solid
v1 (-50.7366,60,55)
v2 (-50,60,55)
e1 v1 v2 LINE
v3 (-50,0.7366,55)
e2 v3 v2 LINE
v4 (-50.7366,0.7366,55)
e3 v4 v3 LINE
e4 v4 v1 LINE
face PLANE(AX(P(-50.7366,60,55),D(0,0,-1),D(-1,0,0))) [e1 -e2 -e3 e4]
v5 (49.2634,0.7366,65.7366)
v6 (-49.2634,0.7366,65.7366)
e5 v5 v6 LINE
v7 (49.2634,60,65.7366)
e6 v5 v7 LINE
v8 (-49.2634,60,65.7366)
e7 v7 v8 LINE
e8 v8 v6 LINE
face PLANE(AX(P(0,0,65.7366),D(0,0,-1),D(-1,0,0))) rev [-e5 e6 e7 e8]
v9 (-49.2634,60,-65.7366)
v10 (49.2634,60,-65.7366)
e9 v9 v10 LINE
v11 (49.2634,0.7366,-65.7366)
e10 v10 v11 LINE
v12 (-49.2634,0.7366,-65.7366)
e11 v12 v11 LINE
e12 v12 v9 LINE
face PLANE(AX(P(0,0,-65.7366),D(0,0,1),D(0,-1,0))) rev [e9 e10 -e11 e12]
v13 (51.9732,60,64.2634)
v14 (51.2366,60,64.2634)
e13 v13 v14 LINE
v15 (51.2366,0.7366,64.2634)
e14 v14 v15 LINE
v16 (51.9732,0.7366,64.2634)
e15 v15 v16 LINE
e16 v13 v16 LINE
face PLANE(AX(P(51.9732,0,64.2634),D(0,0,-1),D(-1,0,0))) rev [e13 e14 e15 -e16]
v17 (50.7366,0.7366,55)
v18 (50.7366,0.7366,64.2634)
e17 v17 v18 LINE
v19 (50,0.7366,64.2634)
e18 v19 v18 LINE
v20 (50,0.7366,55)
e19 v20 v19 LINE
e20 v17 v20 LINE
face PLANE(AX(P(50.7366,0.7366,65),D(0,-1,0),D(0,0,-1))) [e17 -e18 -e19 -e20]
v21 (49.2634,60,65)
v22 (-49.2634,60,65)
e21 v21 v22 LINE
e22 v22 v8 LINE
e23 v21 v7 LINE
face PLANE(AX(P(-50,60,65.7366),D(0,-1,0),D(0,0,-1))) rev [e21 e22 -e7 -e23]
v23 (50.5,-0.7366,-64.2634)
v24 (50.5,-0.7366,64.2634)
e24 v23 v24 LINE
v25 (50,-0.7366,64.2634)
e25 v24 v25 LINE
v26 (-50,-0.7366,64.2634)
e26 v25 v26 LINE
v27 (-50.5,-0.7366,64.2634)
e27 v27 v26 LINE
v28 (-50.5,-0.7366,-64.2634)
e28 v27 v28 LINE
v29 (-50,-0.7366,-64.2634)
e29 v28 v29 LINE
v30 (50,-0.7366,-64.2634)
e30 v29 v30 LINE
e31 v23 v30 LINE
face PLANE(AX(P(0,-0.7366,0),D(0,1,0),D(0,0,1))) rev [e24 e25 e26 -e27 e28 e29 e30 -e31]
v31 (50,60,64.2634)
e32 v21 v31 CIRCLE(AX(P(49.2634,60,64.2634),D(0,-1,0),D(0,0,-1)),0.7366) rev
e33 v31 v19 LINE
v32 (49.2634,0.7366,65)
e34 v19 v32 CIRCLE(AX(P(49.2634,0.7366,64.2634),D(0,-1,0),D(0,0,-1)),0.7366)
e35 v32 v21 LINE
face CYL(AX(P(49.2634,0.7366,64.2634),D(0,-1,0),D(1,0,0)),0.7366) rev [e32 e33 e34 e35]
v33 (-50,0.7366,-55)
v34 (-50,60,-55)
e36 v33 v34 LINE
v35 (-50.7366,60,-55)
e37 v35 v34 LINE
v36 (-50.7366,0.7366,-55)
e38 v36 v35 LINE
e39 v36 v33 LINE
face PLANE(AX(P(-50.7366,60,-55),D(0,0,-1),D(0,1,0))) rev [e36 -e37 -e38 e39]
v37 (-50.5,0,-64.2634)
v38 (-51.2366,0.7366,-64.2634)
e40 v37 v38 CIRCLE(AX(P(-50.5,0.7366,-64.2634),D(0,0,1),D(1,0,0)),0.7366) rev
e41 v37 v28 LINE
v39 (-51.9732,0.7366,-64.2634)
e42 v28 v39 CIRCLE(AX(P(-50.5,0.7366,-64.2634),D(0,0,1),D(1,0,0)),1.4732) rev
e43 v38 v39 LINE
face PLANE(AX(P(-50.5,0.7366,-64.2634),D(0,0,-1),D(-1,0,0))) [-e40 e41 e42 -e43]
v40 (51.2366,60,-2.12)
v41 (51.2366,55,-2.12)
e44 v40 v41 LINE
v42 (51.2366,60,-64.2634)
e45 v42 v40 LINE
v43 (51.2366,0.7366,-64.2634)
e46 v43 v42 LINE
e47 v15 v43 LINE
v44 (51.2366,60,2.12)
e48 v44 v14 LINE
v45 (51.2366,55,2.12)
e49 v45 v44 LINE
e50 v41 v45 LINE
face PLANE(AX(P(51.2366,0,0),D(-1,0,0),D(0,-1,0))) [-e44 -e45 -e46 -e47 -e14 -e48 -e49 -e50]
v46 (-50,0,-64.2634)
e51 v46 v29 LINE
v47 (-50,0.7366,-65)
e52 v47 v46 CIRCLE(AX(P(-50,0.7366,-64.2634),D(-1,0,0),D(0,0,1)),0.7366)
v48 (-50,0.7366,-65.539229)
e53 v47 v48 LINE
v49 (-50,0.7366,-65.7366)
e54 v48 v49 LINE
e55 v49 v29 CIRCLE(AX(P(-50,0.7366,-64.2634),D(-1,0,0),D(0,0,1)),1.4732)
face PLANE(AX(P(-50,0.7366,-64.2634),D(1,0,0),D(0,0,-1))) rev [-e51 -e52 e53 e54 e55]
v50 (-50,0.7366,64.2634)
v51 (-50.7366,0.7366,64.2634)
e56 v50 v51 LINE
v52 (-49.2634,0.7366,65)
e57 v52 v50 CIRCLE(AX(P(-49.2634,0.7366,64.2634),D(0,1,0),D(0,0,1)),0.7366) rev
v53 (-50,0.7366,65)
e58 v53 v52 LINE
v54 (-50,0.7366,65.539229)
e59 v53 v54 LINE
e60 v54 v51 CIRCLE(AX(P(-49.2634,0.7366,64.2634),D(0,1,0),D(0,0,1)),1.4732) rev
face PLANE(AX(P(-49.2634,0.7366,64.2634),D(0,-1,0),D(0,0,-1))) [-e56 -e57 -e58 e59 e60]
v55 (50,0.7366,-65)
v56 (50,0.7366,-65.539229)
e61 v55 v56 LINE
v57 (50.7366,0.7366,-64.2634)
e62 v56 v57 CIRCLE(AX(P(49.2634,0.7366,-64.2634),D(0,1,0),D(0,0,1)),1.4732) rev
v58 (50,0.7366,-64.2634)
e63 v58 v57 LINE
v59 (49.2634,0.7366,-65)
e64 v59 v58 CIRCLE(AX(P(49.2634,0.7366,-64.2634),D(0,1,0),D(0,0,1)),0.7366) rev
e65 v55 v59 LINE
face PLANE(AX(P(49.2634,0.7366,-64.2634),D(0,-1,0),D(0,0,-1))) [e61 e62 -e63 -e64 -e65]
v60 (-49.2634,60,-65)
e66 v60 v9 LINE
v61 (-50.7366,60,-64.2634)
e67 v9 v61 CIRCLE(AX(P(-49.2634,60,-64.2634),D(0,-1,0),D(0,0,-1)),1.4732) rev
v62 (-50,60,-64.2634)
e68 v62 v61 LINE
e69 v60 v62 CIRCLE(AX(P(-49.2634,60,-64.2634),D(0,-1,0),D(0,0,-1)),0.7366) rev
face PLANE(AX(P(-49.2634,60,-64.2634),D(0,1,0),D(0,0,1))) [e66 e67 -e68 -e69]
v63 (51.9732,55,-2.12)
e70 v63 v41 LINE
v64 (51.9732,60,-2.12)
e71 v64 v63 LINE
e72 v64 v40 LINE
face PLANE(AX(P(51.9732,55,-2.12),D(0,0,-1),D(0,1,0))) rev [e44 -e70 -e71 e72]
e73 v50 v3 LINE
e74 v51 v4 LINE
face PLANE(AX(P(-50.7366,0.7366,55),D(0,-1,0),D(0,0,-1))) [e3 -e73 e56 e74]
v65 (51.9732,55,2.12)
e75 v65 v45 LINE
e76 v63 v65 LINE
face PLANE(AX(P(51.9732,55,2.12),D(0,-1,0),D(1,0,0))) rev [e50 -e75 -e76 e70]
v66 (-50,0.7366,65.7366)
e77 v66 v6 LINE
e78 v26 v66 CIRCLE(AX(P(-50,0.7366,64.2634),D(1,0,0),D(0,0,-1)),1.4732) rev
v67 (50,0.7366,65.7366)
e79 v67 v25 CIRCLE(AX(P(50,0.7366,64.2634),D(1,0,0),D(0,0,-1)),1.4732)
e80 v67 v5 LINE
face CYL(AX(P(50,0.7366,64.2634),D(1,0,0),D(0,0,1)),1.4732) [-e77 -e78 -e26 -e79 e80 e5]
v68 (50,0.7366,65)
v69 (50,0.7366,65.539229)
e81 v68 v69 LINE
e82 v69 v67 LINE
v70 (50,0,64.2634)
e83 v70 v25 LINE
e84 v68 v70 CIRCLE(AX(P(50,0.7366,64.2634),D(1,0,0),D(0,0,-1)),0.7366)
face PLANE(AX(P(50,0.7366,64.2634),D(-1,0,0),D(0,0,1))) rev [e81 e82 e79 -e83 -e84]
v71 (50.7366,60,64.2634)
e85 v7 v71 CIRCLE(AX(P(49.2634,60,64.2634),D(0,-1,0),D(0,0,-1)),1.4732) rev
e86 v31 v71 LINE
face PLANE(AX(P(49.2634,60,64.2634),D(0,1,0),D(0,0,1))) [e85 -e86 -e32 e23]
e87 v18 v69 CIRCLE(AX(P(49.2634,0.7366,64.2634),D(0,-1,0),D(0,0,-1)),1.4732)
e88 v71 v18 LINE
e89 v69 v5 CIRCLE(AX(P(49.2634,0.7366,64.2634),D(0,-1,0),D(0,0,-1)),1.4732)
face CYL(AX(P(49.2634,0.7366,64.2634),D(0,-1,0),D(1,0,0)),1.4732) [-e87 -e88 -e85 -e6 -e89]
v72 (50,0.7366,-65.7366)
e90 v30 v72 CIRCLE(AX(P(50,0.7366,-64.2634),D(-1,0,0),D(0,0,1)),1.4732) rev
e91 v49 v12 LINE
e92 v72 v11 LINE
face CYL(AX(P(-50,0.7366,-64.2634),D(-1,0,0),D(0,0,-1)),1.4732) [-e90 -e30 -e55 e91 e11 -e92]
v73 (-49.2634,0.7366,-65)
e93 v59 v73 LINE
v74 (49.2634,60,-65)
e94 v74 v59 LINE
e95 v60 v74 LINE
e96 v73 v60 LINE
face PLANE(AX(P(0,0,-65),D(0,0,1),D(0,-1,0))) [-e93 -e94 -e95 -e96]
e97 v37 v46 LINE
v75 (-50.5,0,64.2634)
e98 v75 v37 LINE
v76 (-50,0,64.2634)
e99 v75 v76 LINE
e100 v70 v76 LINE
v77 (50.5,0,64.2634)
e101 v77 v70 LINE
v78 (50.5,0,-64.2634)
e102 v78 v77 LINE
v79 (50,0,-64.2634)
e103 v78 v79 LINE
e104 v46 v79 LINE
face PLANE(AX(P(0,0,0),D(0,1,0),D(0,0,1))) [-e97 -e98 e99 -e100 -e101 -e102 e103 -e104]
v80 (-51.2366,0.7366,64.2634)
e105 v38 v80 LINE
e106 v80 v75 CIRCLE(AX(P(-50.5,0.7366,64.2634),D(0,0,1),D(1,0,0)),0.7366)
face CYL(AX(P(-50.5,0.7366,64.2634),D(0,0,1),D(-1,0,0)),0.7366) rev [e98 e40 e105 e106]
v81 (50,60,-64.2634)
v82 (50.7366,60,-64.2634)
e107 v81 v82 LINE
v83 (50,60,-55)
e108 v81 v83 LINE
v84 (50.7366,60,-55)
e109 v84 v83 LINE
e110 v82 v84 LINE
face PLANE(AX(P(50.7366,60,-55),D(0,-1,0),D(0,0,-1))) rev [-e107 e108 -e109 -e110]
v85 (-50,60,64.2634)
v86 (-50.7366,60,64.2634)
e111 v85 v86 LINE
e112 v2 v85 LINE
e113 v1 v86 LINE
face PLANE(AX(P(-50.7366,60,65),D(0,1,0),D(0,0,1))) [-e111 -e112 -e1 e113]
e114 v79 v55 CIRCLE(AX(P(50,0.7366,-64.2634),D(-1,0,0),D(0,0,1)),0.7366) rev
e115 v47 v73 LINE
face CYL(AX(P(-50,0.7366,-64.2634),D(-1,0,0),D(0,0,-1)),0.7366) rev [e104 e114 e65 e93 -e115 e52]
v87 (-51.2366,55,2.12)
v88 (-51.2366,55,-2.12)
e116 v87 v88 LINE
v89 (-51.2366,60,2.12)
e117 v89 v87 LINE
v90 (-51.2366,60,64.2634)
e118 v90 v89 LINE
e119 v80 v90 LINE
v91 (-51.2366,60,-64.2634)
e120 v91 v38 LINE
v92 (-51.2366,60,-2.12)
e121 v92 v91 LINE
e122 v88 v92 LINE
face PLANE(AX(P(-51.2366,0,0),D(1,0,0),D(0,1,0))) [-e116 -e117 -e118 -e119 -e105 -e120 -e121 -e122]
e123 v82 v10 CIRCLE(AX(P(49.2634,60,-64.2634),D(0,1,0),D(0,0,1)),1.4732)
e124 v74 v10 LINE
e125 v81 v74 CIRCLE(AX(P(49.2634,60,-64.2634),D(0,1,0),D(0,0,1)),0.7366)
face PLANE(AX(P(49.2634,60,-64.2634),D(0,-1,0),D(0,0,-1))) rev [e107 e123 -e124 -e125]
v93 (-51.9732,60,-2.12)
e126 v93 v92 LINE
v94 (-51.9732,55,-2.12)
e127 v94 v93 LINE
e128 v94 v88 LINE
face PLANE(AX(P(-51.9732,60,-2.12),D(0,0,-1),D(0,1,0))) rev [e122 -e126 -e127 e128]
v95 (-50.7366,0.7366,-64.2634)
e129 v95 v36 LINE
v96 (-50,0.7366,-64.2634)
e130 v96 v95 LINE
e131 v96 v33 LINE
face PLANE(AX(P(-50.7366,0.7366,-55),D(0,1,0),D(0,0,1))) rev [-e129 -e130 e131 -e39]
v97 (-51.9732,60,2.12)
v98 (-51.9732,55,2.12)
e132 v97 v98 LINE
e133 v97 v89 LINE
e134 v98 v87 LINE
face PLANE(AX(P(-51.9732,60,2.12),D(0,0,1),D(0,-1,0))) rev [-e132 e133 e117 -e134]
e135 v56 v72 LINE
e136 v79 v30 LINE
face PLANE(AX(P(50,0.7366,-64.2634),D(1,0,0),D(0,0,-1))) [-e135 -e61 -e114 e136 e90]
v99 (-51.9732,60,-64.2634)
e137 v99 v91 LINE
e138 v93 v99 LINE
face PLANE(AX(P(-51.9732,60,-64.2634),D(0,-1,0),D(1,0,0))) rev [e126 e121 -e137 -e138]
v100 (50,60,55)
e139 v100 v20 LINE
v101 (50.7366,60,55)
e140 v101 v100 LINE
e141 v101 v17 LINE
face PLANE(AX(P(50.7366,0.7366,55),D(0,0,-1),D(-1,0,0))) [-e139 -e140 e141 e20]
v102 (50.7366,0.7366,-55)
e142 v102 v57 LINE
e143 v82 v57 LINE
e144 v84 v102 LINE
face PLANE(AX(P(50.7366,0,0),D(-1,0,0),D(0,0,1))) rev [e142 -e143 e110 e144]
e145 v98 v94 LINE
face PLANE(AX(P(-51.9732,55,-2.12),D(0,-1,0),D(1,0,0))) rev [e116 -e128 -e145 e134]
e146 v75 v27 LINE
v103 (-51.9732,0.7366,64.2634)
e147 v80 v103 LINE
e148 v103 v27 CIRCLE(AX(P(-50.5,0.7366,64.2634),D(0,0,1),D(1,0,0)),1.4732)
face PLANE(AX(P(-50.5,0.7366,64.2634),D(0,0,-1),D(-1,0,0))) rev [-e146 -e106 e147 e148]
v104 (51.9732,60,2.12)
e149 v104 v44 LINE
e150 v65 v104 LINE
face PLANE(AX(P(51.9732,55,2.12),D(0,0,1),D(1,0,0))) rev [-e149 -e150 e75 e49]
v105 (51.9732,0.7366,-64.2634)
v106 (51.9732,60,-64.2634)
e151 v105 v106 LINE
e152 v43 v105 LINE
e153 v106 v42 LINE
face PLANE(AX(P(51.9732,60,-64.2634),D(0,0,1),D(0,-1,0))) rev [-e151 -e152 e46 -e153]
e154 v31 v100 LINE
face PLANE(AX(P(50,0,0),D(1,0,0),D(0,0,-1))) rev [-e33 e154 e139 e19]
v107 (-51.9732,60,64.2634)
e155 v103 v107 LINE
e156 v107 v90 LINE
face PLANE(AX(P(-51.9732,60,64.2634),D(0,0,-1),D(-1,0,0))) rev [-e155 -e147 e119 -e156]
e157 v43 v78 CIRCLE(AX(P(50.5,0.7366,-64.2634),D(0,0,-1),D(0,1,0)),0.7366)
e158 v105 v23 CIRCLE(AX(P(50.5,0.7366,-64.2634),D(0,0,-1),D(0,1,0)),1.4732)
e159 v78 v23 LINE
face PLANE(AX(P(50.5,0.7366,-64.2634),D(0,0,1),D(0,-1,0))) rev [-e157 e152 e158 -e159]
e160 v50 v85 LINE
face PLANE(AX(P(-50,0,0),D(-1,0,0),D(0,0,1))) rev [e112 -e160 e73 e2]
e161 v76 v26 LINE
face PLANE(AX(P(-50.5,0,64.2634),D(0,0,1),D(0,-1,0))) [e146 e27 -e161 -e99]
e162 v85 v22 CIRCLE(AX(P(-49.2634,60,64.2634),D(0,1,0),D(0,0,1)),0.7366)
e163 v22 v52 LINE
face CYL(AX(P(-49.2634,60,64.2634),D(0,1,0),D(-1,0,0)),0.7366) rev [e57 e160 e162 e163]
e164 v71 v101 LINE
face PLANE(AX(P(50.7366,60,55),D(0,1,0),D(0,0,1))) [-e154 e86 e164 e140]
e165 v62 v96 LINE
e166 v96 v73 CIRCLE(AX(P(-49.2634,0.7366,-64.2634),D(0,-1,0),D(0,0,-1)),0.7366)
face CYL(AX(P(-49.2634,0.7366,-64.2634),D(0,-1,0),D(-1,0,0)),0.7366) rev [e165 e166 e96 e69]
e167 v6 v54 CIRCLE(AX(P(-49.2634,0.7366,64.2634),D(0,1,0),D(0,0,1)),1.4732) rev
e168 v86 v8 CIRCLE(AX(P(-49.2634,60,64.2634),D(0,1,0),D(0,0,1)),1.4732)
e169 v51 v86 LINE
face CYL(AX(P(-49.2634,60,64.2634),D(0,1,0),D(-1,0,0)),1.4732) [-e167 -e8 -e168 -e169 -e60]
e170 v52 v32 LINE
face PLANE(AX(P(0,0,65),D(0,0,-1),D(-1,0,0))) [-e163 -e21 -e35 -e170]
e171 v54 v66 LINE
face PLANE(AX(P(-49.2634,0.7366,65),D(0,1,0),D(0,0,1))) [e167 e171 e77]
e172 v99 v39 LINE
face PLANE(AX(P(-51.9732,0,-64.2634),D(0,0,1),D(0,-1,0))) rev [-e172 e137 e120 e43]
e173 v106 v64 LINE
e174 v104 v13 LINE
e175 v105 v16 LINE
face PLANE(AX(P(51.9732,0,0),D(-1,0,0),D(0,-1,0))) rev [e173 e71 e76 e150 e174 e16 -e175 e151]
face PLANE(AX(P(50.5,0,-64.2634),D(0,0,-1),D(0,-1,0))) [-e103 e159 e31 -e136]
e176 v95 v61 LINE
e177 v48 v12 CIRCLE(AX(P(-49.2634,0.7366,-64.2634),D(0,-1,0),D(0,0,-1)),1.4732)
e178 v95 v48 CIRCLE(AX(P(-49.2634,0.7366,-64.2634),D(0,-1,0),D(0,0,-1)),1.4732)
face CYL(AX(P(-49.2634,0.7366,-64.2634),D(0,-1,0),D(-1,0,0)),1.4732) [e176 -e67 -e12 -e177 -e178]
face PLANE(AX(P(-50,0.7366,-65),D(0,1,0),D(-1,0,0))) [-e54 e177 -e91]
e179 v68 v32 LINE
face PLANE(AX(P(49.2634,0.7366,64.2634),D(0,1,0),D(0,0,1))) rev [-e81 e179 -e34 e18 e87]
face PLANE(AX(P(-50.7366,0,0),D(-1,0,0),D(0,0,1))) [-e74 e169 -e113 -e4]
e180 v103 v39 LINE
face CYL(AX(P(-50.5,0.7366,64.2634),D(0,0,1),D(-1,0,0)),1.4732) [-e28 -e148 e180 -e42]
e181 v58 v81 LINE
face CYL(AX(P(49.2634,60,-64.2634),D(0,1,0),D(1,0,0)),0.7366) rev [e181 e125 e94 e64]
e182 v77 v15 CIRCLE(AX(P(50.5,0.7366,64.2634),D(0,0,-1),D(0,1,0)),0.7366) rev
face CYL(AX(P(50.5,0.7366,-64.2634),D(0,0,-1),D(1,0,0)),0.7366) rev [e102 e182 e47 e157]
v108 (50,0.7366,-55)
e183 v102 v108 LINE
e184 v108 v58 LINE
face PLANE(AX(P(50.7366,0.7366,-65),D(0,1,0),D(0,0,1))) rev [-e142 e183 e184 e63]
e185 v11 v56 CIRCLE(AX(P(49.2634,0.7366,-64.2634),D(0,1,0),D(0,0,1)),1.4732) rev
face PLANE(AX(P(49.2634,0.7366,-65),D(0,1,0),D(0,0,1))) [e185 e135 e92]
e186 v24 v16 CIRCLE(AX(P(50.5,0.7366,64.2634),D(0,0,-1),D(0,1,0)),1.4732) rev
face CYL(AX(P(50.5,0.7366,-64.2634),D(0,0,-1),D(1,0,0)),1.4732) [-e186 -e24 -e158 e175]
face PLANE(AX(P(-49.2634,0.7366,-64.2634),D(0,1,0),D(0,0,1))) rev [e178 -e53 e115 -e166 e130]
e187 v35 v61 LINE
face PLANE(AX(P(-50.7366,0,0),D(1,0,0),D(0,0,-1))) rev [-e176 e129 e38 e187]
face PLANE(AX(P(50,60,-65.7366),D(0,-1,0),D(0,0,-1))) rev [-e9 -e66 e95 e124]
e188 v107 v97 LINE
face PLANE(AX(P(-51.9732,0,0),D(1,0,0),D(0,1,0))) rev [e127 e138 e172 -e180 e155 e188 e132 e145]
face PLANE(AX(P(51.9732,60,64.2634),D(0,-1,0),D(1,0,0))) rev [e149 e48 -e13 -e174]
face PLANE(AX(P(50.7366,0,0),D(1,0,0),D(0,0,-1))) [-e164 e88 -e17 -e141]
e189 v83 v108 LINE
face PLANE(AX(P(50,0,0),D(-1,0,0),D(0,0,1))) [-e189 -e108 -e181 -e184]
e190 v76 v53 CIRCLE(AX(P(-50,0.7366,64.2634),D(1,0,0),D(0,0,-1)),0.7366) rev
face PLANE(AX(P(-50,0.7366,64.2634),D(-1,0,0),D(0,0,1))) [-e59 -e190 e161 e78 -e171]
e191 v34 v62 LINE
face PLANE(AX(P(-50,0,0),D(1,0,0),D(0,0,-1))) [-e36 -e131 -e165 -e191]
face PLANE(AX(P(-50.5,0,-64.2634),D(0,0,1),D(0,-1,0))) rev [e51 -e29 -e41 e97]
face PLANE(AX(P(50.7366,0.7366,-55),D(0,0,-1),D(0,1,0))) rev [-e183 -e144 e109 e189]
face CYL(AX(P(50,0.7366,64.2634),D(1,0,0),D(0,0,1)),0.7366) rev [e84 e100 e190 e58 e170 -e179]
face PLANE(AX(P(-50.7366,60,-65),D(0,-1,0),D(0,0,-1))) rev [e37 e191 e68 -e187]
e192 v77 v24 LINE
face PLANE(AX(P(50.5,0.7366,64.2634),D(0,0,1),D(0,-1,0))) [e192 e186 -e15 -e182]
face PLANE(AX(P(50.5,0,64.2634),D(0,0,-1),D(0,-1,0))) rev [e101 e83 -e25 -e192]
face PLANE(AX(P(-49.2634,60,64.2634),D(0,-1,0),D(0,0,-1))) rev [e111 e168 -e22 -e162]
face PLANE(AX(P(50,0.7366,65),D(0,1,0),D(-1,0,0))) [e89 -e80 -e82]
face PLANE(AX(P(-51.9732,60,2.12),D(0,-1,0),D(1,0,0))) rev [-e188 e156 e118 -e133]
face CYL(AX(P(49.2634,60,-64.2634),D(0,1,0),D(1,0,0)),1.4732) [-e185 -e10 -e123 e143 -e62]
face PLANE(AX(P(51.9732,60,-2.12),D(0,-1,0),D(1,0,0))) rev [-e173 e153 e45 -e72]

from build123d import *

# Parameters (mm, degrees)
SKETCH1_W                        = 100
SKETCH1_H                        = 130
BASE_FLANGE1_DEPTH               = 0.7366
BOX_REAR_STRIP_W                 = 4.4196
BOX_REAR_STRIP_H                 = 0.7366
BOX_REAR_STRIP_CUT_DEPTH         = 100
BOX_REAR_DEPTH                   = 100
BOX_FRONT_STRIP_W                = 4.4196
BOX_FRONT_STRIP_H                = 0.7366
BOX_FRONT_STRIP_CUT_DEPTH        = 100
BOX_FRONT_DEPTH                  = 100
BOX_FRONT_TABS_STRIP_W           = 4.4196
BOX_FRONT_TABS_STRIP_H           = 0.7366
BOX_FRONT_TABS_STRIP_CUT_DEPTH   = 59.2634
BOX_FRONT_TABS_STRIP_2_W         = 4.4196
BOX_FRONT_TABS_STRIP_2_H         = 0.7366
BOX_FRONT_TABS_STRIP_CUT_2_DEPTH = 59.2634
BOX_FRONT_TABS_DEPTH             = 59.2634
BOX_FRONT_TABS_BEND_DEPTH        = 59.2634
BOX_REAR_TABS_STRIP_W            = 4.4196
BOX_REAR_TABS_STRIP_H            = 0.7366
BOX_REAR_TABS_STRIP_CUT_DEPTH    = 59.2634
BOX_REAR_TABS_STRIP_2_W          = 4.4196
BOX_REAR_TABS_STRIP_2_H          = 0.7366
BOX_REAR_TABS_STRIP_CUT_2_DEPTH  = 59.2634
BOX_REAR_TABS_DEPTH              = 59.2634
BOX_REAR_TABS_BEND_DEPTH         = 59.2634
EDGE_FLANGE6_DEPTH               = 128.5268
EDGE_FLANGE6_START               = 0.7366
EDGE_FLANGE6_FLAT_DEPTH          = 0.7366
EDGE_FLANGE6_BEND_DEPTH          = 128.5268
EDGE_FLANGE6_FLAT_2_DEPTH        = 0.7366


# Sheet-metal steps are written as plain solids
with BuildPart() as part:
    # Sketch1 → Base-Flange1 (new body)
    with BuildSketch(Plane(origin=(0, 0, 0), x_dir=(1, 0, 0), z_dir=(0, 1, 0))):
        Rectangle(SKETCH1_W, SKETCH1_H)
    extrude(amount=-BASE_FLANGE1_DEPTH)

    # Box rear strip (across the edge) → Box rear strip cut (cut)
    with BuildSketch(Plane(origin=(50, 0, -65), x_dir=(0, 0, 1), z_dir=(-1, 0, 0))):
        with Locations((-1.4732, -0.3683)):
            Rectangle(BOX_REAR_STRIP_W, BOX_REAR_STRIP_H)
    extrude(amount=BOX_REAR_STRIP_CUT_DEPTH, mode=Mode.SUBTRACT)

    # Box rear section (across the edge) → Box rear (add)
    with BuildSketch(Plane(origin=(50, 0, -65), x_dir=(0, 0, 1), z_dir=(-1, 0, 0))):
        with BuildLine():
            Line((-0.7366, 0.7366), (-0.7366, 60))
            Line((-0.7366, 60), (0, 60))
            Line((0, 60), (0, 0.7366))
            ThreePointArc((0, 0.7366), (0.215745145, 0.215745145), (0.7366, 0))
            Line((0.7366, 0), (0.7366, -0.7366))
            ThreePointArc((0.7366, -0.7366), (-0.30510971, -0.30510971), (-0.7366, 0.7366))
        make_face()
    extrude(amount=BOX_REAR_DEPTH)

    # Box front strip (across the edge) → Box front strip cut (cut)
    with BuildSketch(Plane(origin=(-50, 0, 65), x_dir=(0, 0, -1), z_dir=(1, 0, 0))):
        with Locations((-1.4732, -0.3683)):
            Rectangle(BOX_FRONT_STRIP_W, BOX_FRONT_STRIP_H)
    extrude(amount=BOX_FRONT_STRIP_CUT_DEPTH, mode=Mode.SUBTRACT)

    # Box front section (across the edge) → Box front (add)
    with BuildSketch(Plane(origin=(-50, 0, 65), x_dir=(0, 0, -1), z_dir=(1, 0, 0))):
        with BuildLine():
            Line((-0.7366, 0.7366), (-0.7366, 60))
            Line((-0.7366, 60), (0, 60))
            Line((0, 60), (0, 0.7366))
            ThreePointArc((0, 0.7366), (0.215745145, 0.215745145), (0.7366, 0))
            Line((0.7366, 0), (0.7366, -0.7366))
            ThreePointArc((0.7366, -0.7366), (-0.30510971, -0.30510971), (-0.7366, 0.7366))
        make_face()
    extrude(amount=BOX_FRONT_DEPTH)

    # Box-front tabs strip (across the edge) → Box-front tabs strip cut (cut)
    with BuildSketch(Plane(origin=(-50, 0.7366, 65), x_dir=(1, 0, 0), z_dir=(0, 1, 0))):
        with Locations((-1.4732, -0.3683)):
            Rectangle(BOX_FRONT_TABS_STRIP_W, BOX_FRONT_TABS_STRIP_H)
    extrude(amount=BOX_FRONT_TABS_STRIP_CUT_DEPTH, mode=Mode.SUBTRACT)

    # Box-front tabs strip 2 (across the edge) → Box-front tabs strip cut 2 (cut)
    with BuildSketch(Plane(origin=(50, 60, 65), x_dir=(-1, 0, 0), z_dir=(0, -1, 0))):
        with Locations((-1.4732, -0.3683)):
            Rectangle(BOX_FRONT_TABS_STRIP_2_W, BOX_FRONT_TABS_STRIP_2_H)
    extrude(amount=BOX_FRONT_TABS_STRIP_CUT_2_DEPTH, mode=Mode.SUBTRACT)

    # Box-front tabs section (across the edge) → Box-front tabs (add)
    with BuildSketch(Plane(origin=(-50, 0.7366, 65), x_dir=(1, 0, 0), z_dir=(0, 1, 0))):
        with BuildLine():
            Line((-0.7366, 0.7366), (-0.7366, 10))
            Line((-0.7366, 10), (0, 10))
            Line((0, 10), (0, 0.7366))
            ThreePointArc((0, 0.7366), (0.215745145, 0.215745145), (0.7366, 0))
            Line((0.7366, 0), (0.7366, -0.7366))
            ThreePointArc((0.7366, -0.7366), (-0.30510971, -0.30510971), (-0.7366, 0.7366))
        make_face()
    extrude(amount=BOX_FRONT_TABS_DEPTH)

    # Box-front tabs section 2 (across the edge) → Box-front tabs bend (add)
    with BuildSketch(Plane(origin=(50, 60, 65), x_dir=(-1, 0, 0), z_dir=(0, -1, 0))):
        with BuildLine():
            Line((-0.7366, 0.7366), (-0.7366, 10))
            Line((-0.7366, 10), (0, 10))
            Line((0, 10), (0, 0.7366))
            ThreePointArc((0, 0.7366), (0.215745145, 0.215745145), (0.7366, 0))
            Line((0.7366, 0), (0.7366, -0.7366))
            ThreePointArc((0.7366, -0.7366), (-0.30510971, -0.30510971), (-0.7366, 0.7366))
        make_face()
    extrude(amount=BOX_FRONT_TABS_BEND_DEPTH)

    # Box-rear tabs strip (across the edge) → Box-rear tabs strip cut (cut)
    with BuildSketch(Plane(origin=(50, 0.7366, -65), x_dir=(-1, 0, 0), z_dir=(0, 1, 0))):
        with Locations((-1.4732, -0.3683)):
            Rectangle(BOX_REAR_TABS_STRIP_W, BOX_REAR_TABS_STRIP_H)
    extrude(amount=BOX_REAR_TABS_STRIP_CUT_DEPTH, mode=Mode.SUBTRACT)

    # Box-rear tabs strip 2 (across the edge) → Box-rear tabs strip cut 2 (cut)
    with BuildSketch(Plane(origin=(-50, 60, -65), x_dir=(1, 0, 0), z_dir=(0, -1, 0))):
        with Locations((-1.4732, -0.3683)):
            Rectangle(BOX_REAR_TABS_STRIP_2_W, BOX_REAR_TABS_STRIP_2_H)
    extrude(amount=BOX_REAR_TABS_STRIP_CUT_2_DEPTH, mode=Mode.SUBTRACT)

    # Box-rear tabs section (across the edge) → Box-rear tabs (add)
    with BuildSketch(Plane(origin=(50, 0.7366, -65), x_dir=(-1, 0, 0), z_dir=(0, 1, 0))):
        with BuildLine():
            Line((-0.7366, 0.7366), (-0.7366, 10))
            Line((-0.7366, 10), (0, 10))
            Line((0, 10), (0, 0.7366))
            ThreePointArc((0, 0.7366), (0.215745145, 0.215745145), (0.7366, 0))
            Line((0.7366, 0), (0.7366, -0.7366))
            ThreePointArc((0.7366, -0.7366), (-0.30510971, -0.30510971), (-0.7366, 0.7366))
        make_face()
    extrude(amount=BOX_REAR_TABS_DEPTH)

    # Box-rear tabs section 2 (across the edge) → Box-rear tabs bend (add)
    with BuildSketch(Plane(origin=(-50, 60, -65), x_dir=(1, 0, 0), z_dir=(0, -1, 0))):
        with BuildLine():
            Line((-0.7366, 0.7366), (-0.7366, 10))
            Line((-0.7366, 10), (0, 10))
            Line((0, 10), (0, 0.7366))
            ThreePointArc((0, 0.7366), (0.215745145, 0.215745145), (0.7366, 0))
            Line((0.7366, 0), (0.7366, -0.7366))
            ThreePointArc((0.7366, -0.7366), (-0.30510971, -0.30510971), (-0.7366, 0.7366))
        make_face()
    extrude(amount=BOX_REAR_TABS_BEND_DEPTH)

    # Edge-Flange6 bend section (across the edge) → Edge-Flange6 (add)
    with BuildSketch(Plane(origin=(-51.2366, 0, -64.2634), x_dir=(1, 0, 0), z_dir=(0, 0, 1))):
        with BuildLine():
            Line((-0.7366, 0.7366), (0, 0.7366))
            ThreePointArc((0, 0.7366), (0.215745145, 0.215745145), (0.7366, 0))
            Line((0.7366, 0), (1.2366, 0))
            Line((1.2366, 0), (1.2366, -0.7366))
            Line((1.2366, -0.7366), (0.7366, -0.7366))
            ThreePointArc((0.7366, -0.7366), (-0.30510971, -0.30510971), (-0.7366, 0.7366))
        make_face()
    extrude(amount=EDGE_FLANGE6_DEPTH)

    # Edge-Flange6 profile (on flange) → Edge-Flange6 flat (add)
    with BuildSketch(Plane.ZY.offset(51.2366).offset(EDGE_FLANGE6_START)):
        Polygon((-64.2634, 60), (-64.2634, 0.7366), (64.2634, 0.7366), (64.2634, 60), (2.12, 60), (2.12, 55), (-2.12, 55), (-2.12, 60), align=None)
    extrude(amount=-EDGE_FLANGE6_FLAT_DEPTH)

    # Edge-Flange6 bend section 2 (across the edge) → Edge-Flange6 bend (add)
    with BuildSketch(Plane(origin=(51.2366, 0, 64.2634), x_dir=(-1, 0, 0), z_dir=(0, 0, -1))):
        with BuildLine():
            Line((-0.7366, 0.7366), (0, 0.7366))
            ThreePointArc((0, 0.7366), (0.215745145, 0.215745145), (0.7366, 0))
            Line((0.7366, 0), (1.2366, 0))
            Line((1.2366, 0), (1.2366, -0.7366))
            Line((1.2366, -0.7366), (0.7366, -0.7366))
            ThreePointArc((0.7366, -0.7366), (-0.30510971, -0.30510971), (-0.7366, 0.7366))
        make_face()
    extrude(amount=EDGE_FLANGE6_BEND_DEPTH)

    # Edge-Flange6 profile 2 (on flange) → Edge-Flange6 flat 2 (add)
    with BuildSketch(Plane(origin=(51.2366, 0, 0), x_dir=(0, 0, -1), z_dir=(1, 0, 0)).offset(EDGE_FLANGE6_START)):
        Polygon((-64.2634, 60), (-64.2634, 0.7366), (64.2634, 0.7366), (64.2634, 60), (2.12, 60), (2.12, 55), (-2.12, 55), (-2.12, 60), align=None)
    extrude(amount=-EDGE_FLANGE6_FLAT_2_DEPTH)


solid = part.part
